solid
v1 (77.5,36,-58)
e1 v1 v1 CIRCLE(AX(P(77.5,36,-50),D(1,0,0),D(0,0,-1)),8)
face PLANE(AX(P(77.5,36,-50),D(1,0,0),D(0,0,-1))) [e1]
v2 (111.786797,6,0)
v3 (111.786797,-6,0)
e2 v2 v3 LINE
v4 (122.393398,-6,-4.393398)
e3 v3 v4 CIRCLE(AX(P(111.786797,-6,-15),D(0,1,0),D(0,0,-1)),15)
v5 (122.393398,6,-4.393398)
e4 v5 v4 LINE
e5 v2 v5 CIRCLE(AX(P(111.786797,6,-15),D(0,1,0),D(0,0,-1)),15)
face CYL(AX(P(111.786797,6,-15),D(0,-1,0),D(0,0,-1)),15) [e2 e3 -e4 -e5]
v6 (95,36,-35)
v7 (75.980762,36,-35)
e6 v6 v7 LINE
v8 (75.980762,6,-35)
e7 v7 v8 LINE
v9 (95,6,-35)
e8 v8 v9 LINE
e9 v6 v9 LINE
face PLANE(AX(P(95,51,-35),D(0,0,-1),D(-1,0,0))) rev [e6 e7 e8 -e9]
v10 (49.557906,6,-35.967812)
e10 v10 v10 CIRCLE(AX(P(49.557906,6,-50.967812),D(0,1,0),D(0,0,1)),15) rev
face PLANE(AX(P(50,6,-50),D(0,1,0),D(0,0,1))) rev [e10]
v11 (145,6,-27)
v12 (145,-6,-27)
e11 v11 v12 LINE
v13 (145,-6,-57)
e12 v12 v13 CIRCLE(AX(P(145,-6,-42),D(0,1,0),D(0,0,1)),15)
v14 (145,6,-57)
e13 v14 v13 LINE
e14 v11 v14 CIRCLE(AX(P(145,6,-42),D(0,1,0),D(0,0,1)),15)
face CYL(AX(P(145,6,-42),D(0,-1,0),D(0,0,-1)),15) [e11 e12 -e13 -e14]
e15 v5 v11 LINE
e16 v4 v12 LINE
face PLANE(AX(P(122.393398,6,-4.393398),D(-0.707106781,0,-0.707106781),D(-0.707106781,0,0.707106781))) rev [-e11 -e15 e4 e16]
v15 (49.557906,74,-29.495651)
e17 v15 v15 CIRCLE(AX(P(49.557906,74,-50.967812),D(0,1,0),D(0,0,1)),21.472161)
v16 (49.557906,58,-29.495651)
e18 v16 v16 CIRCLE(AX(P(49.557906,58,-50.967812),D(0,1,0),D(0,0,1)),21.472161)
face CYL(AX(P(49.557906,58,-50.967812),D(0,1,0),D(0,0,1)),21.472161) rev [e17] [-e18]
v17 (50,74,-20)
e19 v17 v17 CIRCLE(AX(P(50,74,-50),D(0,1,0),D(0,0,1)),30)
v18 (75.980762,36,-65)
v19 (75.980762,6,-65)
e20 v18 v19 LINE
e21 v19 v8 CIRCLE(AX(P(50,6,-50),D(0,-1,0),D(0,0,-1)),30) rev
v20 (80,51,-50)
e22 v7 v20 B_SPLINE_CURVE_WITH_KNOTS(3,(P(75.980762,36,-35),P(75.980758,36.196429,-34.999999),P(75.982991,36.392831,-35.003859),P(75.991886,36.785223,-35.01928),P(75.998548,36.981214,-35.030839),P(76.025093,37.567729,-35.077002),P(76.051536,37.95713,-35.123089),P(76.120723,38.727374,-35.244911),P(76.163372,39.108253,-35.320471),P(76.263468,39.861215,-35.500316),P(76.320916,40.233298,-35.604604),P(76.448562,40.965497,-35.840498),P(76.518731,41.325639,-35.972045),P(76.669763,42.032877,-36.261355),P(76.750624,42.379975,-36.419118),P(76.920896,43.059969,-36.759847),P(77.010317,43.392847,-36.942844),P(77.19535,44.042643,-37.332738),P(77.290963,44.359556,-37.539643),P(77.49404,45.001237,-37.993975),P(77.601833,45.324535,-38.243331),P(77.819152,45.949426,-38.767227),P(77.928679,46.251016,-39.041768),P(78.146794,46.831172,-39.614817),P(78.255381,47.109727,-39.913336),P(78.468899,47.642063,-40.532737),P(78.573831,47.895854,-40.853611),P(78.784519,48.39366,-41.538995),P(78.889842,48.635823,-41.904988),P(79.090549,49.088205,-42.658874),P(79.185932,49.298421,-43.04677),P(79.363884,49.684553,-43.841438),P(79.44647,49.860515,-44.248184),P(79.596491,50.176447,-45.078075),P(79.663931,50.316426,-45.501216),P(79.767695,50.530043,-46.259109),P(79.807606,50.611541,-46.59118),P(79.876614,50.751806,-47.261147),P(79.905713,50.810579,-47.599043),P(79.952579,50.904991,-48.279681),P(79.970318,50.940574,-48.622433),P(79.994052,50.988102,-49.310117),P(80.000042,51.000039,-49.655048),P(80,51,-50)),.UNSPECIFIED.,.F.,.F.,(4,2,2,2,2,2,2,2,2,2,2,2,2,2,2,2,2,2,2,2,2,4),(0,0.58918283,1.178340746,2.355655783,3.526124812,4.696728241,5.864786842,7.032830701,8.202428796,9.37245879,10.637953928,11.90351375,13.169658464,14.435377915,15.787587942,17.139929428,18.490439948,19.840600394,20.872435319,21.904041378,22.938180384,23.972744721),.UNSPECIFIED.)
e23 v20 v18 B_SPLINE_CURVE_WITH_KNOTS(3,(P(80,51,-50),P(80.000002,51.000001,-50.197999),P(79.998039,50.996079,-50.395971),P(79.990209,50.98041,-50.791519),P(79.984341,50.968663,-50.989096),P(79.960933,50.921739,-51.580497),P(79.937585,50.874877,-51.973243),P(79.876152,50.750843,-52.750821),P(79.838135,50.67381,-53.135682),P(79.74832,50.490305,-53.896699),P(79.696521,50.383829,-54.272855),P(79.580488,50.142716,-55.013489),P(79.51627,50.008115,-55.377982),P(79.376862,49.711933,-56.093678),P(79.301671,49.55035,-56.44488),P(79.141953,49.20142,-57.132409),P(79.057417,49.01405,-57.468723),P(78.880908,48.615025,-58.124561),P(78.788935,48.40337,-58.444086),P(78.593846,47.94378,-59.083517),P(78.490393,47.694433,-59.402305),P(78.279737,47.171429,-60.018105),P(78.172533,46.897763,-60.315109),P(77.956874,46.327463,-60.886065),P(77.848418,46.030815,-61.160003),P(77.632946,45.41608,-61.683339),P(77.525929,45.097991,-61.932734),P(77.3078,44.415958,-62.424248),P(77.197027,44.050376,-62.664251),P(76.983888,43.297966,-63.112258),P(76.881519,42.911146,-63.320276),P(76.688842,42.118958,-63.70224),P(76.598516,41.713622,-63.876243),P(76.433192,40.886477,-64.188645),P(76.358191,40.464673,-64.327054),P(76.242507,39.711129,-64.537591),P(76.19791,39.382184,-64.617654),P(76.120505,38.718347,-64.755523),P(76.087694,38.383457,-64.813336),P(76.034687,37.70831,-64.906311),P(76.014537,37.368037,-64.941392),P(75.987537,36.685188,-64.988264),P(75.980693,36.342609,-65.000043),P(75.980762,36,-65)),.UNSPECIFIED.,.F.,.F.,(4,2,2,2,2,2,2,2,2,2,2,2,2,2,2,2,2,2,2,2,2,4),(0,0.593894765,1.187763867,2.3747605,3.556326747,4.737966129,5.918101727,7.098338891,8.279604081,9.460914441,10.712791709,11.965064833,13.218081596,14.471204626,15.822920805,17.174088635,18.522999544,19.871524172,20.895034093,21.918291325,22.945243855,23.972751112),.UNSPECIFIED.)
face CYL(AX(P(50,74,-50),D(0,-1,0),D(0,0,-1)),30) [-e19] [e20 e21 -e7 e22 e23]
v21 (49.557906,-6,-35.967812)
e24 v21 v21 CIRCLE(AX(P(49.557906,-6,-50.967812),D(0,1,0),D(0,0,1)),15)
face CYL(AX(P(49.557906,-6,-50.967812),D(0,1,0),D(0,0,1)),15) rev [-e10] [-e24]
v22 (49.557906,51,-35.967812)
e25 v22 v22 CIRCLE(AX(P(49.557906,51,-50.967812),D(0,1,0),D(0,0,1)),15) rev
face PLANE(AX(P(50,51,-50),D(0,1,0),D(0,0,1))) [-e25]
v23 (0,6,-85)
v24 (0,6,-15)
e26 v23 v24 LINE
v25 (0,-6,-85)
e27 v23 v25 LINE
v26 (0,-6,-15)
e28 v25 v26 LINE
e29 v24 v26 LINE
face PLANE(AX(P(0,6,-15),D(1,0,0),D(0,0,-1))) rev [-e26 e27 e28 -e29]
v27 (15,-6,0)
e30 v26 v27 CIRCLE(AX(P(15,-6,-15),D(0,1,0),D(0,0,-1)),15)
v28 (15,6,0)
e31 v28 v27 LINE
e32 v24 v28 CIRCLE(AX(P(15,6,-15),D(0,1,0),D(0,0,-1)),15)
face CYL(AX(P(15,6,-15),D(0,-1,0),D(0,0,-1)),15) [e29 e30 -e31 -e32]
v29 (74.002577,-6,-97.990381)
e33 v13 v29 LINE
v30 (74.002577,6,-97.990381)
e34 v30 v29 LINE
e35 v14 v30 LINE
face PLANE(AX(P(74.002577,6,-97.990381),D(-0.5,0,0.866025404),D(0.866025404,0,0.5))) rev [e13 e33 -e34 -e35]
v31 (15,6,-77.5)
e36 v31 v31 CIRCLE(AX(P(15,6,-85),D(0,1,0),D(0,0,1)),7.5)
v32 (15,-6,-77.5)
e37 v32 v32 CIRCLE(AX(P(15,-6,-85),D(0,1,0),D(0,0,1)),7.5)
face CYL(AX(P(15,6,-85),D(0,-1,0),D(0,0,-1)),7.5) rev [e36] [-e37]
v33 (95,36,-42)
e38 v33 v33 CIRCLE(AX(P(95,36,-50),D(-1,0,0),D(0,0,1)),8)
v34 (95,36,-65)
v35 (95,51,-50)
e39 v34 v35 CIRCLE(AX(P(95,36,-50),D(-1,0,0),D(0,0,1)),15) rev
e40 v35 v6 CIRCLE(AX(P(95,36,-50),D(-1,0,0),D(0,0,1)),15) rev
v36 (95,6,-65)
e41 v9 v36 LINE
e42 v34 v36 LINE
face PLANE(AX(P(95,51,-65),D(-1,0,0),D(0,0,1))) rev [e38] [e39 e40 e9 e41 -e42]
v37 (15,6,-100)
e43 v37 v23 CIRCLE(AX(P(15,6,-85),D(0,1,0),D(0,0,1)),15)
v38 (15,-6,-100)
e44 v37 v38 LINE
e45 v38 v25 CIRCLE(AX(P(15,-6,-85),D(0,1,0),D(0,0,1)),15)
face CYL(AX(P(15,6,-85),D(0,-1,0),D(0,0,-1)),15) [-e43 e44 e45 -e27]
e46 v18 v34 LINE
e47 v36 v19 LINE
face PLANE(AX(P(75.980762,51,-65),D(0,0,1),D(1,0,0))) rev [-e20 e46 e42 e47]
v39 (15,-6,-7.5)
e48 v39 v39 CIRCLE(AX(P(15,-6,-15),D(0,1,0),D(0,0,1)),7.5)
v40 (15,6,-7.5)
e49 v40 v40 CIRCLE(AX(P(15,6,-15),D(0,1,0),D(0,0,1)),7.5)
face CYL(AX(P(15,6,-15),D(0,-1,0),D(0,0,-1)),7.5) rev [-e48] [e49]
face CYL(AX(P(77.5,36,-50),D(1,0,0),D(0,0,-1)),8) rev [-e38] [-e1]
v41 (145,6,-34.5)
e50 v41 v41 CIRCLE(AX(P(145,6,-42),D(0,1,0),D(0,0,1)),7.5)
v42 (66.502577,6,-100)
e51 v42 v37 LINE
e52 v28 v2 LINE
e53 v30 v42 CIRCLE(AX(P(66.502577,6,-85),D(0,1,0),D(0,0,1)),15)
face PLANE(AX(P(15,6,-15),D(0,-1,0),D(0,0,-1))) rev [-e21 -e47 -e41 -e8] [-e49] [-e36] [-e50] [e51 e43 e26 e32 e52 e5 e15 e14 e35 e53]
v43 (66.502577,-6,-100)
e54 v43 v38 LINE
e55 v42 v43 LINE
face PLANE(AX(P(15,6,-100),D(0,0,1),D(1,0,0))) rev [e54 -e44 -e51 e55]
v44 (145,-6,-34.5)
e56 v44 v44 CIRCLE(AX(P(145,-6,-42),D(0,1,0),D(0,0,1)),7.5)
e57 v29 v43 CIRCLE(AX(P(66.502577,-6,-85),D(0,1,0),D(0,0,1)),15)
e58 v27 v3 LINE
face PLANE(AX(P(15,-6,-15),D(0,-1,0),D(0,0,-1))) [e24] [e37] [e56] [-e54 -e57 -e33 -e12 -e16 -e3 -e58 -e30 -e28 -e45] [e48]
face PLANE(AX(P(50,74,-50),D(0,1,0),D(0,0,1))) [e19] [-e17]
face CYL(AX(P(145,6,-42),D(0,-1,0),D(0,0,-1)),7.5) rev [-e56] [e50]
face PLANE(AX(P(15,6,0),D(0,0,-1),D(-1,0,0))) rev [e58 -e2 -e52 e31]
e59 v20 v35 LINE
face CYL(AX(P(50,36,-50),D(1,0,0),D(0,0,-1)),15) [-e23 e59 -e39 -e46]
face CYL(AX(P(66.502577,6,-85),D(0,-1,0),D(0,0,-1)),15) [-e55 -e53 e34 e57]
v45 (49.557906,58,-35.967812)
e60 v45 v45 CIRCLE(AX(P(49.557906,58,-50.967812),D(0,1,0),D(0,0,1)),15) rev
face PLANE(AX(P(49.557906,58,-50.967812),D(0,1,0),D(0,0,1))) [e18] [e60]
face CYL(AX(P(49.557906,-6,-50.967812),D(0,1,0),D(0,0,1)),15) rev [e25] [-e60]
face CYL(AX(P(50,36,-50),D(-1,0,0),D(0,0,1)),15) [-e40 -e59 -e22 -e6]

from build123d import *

# Parameters (mm, degrees)
SKETCH2_R           = 7.5
BOSS_EXTRUDE3_DEPTH = 6
SKETCH4_R           = 30
BOSS_EXTRUDE6_DEPTH = 68
SKETCH5_R           = 15
CUT_EXTRUDE1_DEPTH  = 205.939015319
SKETCH6_R           = 21.472161424
CUT_EXTRUDE3_DEPTH  = 16
BOSS_EXTRUDE7_DEPTH = 45
FILLET2_R           = 15
SKETCH9_R           = 8
CUT_EXTRUDE8_DEPTH  = 17.5


with BuildPart() as part:
    # Sketch2 → Boss-Extrude3 (new, symmetric)
    with BuildSketch(Plane(origin=(0, 0, 0), x_dir=(1, 0, 0), z_dir=(0, 1, 0))):
        with BuildLine():
            Line((0, 15), (0, 85))
            ThreePointArc((0, 85), (4.393398282, 95.606601718), (15, 100))
            Line((15, 100), (66.502577388, 100))
            ThreePointArc((66.502577388, 100), (70.384863065, 99.488887394), (74.002577388, 97.990381057))
            Line((74.002577388, 97.990381057), (145, 57))
            ThreePointArc((145, 57), (160, 42), (145, 27))
            Line((145, 27), (122.393398282, 4.393398282))
            ThreePointArc((122.393398282, 4.393398282), (117.52704805, 1.141807012), (111.786796564, 0))
            Line((111.786796564, 0), (15, 0))
            ThreePointArc((15, 0), (4.393398282, 4.393398282), (0, 15))
        make_face()
        with Locations(Location((145, 42, 0), (0, 0, 270))):
            Circle(SKETCH2_R, mode=Mode.SUBTRACT)
        with Locations(Location((15, 85, 0), (0, 0, 270))):
            Circle(SKETCH2_R, mode=Mode.SUBTRACT)
        with Locations(Location((15, 15, 0), (0, 0, 270))):
            Circle(SKETCH2_R, mode=Mode.SUBTRACT)
    extrude(amount=BOSS_EXTRUDE3_DEPTH, both=True)

    # Sketch4 → Boss-Extrude6 (add)
    with BuildSketch(Plane(origin=(0, 6, 0), x_dir=(1, 0, 0), z_dir=(0, 1, 0))):
        with Locations(Location((50, 50, 0), (0, 0, 90))):
            Circle(SKETCH4_R)
    extrude(amount=BOSS_EXTRUDE6_DEPTH)

    # Sketch5 → Cut-Extrude1 (cut, through all)
    with BuildSketch(Plane(origin=(0, 74, 0), x_dir=(1, 0, 0), z_dir=(0, 1, 0))):
        with Locations(Location((49.557906347, 50.967812226, 0), (0, 0, 270))):
            Circle(SKETCH5_R)
    extrude(amount=-CUT_EXTRUDE1_DEPTH, mode=Mode.SUBTRACT)

    # Sketch6 → Cut-Extrude3 (cut)
    with BuildSketch(Plane(origin=(0, 74, 0), x_dir=(1, 0, 0), z_dir=(0, 1, 0))):
        with Locations(Location((49.557906347, 50.967812226, 0), (0, 0, 270))):
            Circle(SKETCH6_R)
    extrude(amount=-CUT_EXTRUDE3_DEPTH, mode=Mode.SUBTRACT)

    # Sketch8 → Boss-Extrude7 (add)
    with BuildSketch(Plane(origin=(0, 6, 0), x_dir=(1, 0, 0), z_dir=(0, 1, 0))):
        with BuildLine():
            Line((75.980762114, 65), (95, 65))
            Line((95, 65), (95, 50))
            Line((95, 50), (95, 35))
            Line((95, 35), (75.980762114, 35))
            ThreePointArc((75.980762114, 35), (20, 50), (75.980762114, 65))
        make_face()
    extrude(amount=BOSS_EXTRUDE7_DEPTH)

    # Fillet2
    # the kernel refuses this fillet: 15 mm, written as the material it takes off along each edge
    with BuildSketch(Plane(origin=(38.480762114, 51, -65), x_dir=(0, 0, 1), z_dir=(1, 0, 0))) as fillet2_piece_1_section:
        with BuildLine():
            CenterArc((FILLET2_R, FILLET2_R), FILLET2_R, 180, 90)
            Line((0, FILLET2_R), (0, 0))
            Line((0, 0), (FILLET2_R, 0))
        make_face()
    fillet2_piece_1 = extrude(amount=94.019237886, mode=Mode.PRIVATE)
    fillet2_piece_1 = fillet2_piece_1 - Plane(origin=(50, 47.545700525, -50), x_dir=(0, 0, -1), z_dir=(0, -1, 0)) * Cylinder(30, 249, mode=Mode.PRIVATE)
    add(fillet2_piece_1, mode=Mode.SUBTRACT)
    with BuildSketch(Plane(origin=(132.5, 51, -35), x_dir=(0, -1, 0), z_dir=(-1, 0, 0))) as fillet2_piece_2_section:
        with BuildLine():
            CenterArc((FILLET2_R, -FILLET2_R), FILLET2_R, 90, 90)
            Line((0, -FILLET2_R), (0, 0))
            Line((0, 0), (FILLET2_R, 0))
        make_face()
    fillet2_piece_2 = extrude(amount=94.019237886, mode=Mode.PRIVATE)
    fillet2_piece_2 = fillet2_piece_2 - Plane(origin=(50, 47.545704386, -50), x_dir=(0, 0, -1), z_dir=(0, -1, 0)) * Cylinder(30, 249, mode=Mode.PRIVATE)
    add(fillet2_piece_2, mode=Mode.SUBTRACT)

    # Sketch9 → Cut-Extrude8 (cut, symmetric)
    with BuildSketch(Plane(origin=(95, 0, 0), x_dir=(0, 0, -1), z_dir=(1, 0, 0))):
        with Locations((50, 36)):
            Circle(SKETCH9_R)
    extrude(amount=CUT_EXTRUDE8_DEPTH, both=True, mode=Mode.SUBTRACT)


solid = part.part
